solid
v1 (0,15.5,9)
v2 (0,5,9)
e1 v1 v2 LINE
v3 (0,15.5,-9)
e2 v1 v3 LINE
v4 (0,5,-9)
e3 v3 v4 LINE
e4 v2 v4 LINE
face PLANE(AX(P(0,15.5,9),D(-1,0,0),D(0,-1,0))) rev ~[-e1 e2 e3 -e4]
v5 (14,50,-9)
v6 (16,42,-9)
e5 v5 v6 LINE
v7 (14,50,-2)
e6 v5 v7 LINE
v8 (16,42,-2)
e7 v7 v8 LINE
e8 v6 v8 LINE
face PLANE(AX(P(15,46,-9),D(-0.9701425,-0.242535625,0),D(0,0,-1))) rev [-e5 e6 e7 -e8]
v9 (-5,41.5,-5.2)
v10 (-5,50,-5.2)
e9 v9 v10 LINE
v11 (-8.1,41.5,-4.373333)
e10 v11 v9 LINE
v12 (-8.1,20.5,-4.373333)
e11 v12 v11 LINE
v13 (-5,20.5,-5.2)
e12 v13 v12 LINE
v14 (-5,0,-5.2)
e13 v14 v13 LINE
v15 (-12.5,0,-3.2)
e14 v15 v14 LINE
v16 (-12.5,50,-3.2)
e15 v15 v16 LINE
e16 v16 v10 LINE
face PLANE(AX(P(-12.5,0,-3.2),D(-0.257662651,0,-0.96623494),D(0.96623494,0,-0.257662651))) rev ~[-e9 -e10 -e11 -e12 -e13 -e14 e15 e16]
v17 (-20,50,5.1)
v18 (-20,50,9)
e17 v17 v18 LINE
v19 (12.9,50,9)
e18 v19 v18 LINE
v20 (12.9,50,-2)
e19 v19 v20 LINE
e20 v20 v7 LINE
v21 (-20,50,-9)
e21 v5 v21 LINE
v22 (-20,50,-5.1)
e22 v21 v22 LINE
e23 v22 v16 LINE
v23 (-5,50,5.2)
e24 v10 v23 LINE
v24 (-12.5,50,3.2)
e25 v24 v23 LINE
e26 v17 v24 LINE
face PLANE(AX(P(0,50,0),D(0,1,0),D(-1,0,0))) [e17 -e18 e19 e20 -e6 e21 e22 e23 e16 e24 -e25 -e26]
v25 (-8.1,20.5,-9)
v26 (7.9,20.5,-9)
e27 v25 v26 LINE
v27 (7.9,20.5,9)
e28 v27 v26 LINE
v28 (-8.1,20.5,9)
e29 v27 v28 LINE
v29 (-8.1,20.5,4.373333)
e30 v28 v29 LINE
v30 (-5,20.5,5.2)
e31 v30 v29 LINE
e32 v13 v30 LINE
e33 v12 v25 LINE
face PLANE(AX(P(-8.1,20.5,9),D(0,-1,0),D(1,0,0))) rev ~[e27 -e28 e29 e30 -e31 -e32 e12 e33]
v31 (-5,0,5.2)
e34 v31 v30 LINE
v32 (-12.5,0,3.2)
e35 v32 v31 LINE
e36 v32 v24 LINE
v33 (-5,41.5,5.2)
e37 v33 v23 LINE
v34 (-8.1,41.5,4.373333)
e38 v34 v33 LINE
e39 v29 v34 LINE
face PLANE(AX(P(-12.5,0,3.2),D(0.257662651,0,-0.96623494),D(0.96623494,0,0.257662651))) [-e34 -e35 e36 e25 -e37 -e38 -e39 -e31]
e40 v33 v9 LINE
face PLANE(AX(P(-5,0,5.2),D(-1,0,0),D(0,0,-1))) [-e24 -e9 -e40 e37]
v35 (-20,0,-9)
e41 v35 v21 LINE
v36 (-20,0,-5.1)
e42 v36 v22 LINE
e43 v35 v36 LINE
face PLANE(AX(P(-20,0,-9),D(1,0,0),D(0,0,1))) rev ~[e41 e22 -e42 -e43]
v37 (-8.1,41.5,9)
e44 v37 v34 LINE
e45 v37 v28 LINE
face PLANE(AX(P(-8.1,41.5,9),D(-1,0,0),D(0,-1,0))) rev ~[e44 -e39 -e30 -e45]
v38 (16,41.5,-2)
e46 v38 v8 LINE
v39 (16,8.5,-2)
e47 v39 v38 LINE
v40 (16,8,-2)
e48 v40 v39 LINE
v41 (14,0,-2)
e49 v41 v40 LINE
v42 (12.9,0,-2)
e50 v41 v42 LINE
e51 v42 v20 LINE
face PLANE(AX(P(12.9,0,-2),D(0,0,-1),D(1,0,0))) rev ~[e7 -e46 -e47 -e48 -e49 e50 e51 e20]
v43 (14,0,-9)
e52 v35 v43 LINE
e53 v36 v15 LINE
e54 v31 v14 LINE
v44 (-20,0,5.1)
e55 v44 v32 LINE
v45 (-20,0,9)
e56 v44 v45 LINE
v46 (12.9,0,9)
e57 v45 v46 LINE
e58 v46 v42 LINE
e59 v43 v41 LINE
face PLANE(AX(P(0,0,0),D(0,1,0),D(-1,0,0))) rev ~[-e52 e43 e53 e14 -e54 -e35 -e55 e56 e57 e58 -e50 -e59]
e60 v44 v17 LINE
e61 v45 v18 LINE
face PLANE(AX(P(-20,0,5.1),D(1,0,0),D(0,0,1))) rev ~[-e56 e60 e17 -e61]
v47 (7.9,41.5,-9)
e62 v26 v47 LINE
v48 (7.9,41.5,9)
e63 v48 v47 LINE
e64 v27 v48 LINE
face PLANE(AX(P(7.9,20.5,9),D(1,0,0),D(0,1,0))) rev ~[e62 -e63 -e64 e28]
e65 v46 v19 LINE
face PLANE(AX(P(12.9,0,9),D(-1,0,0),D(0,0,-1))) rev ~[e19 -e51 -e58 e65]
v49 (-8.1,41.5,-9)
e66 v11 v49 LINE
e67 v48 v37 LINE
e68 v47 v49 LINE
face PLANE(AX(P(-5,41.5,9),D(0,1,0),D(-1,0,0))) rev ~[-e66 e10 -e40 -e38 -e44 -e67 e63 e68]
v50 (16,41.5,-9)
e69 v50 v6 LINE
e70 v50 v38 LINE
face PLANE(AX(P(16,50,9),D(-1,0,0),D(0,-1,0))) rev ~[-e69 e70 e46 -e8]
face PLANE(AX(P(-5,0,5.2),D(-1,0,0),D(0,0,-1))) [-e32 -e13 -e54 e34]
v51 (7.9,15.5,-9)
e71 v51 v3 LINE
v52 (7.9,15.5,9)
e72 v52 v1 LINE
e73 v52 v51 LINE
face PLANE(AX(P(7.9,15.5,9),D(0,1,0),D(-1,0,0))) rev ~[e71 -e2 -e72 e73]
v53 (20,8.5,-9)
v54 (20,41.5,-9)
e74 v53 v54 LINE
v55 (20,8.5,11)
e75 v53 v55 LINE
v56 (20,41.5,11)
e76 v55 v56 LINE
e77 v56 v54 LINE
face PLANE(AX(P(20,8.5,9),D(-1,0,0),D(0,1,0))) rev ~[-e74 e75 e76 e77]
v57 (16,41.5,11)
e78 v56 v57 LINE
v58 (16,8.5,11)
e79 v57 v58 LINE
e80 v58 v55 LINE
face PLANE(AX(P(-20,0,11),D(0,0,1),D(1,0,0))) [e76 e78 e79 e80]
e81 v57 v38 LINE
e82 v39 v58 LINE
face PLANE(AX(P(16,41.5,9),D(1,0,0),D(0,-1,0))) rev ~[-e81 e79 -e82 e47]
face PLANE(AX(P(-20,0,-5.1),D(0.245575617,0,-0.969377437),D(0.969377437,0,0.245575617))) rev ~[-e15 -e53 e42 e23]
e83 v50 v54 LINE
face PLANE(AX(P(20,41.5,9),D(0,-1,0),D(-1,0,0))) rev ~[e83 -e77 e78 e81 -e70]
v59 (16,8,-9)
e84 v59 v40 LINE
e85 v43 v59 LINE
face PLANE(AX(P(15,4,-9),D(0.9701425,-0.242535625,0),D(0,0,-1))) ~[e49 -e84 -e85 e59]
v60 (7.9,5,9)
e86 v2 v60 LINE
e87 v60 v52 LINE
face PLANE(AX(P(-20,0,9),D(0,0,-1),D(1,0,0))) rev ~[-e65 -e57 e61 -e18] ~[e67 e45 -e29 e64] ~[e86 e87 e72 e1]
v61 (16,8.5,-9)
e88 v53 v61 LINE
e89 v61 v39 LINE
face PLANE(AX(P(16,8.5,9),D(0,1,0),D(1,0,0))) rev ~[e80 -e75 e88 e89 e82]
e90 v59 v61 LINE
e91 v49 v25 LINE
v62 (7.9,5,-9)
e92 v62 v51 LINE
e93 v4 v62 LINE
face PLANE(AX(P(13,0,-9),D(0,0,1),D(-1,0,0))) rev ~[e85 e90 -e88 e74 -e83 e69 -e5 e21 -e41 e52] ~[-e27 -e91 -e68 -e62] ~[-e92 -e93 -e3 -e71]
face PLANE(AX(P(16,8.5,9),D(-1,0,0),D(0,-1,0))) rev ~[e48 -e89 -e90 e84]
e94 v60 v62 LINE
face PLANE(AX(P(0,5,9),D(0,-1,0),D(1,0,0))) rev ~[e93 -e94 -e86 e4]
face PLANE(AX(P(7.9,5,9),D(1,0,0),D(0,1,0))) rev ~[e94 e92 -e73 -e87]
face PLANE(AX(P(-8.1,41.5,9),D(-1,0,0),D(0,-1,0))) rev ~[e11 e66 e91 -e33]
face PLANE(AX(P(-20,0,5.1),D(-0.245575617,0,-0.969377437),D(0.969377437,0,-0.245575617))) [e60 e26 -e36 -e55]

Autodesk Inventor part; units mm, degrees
ref_plane "YZ Plane" through (0, 0, 0) normal (1, 0, 0) x (0, 1, 0)
ref_plane "XZ Plane" through (0, 0, 0) normal (0, 1, 0) x (-1, 0, 0)
ref_plane "XY Plane" through (0, 0, 0) normal (0, 0, 1) x (1, 0, 0)
sketch "草图1" plane through (0, 0, 0) normal (0, 1, 0) x (-1, 0, 0)
  line L0 (20, 9) -> (-20, 9)
  line L1 (-20, 9) -> (-20, -9)
  line L2 (-20, -9) -> (20, -9)
  line L3 (20, 5.1) -> (12.5, 3.2)
  line L4 (12.5, 3.2) -> (5, 5.2)
  line L5 (5, 0) -> (0, 0)
  line L6 (20, -5.1) -> (12.5, -3.2)
  line L7 (12.5, -3.2) -> (5, -5.2)
  line L8 (-13, 9) -> (-13, -9)
  line L9 (20, -9) -> (20, -5.1)
  line L10 (20, 5.1) -> (20, 9)
  line L11 (5, 5.2) -> (5, -5.2)
  line L12 (5, -5.2) -> (-20, -5.2)
  line L13 (-12.9, 9) -> (-12.9, -2)
  line L14 (-12.9, -2) -> (-16, -2)
  line L15 (-16, -2) -> (-16, 9)
  line L16 (-12.9, -2) -> (-16, -2)
  line L17 (-16, -2) -> (-16, 9)
  line L18 (-16, 9) -> (-12.9, 9)
  line L19 (-12.9, 9) -> (-12.9, -2)
  dimension "d0" = 18
  dimension "d1" = 40
  dimension "d4" = 3.9
  dimension "d6" = 5.8
  dimension "d8" = 3.8
  dimension "d13" = 33
  dimension "d14" = 11
  dimension "d15" = 3.1
  dimension "d16" = 4
  dimension "d39" = 9
extrude "拉伸1" add sketch "草图1" along normal blind 50
extrude "拉伸2" cut sketch "草图1" along normal blind 50 contours L13 L14 L8 L0 | L8 L14 L15 L0
sketch "草图2" plane through (20, 0, 9) normal (0, 0, 1) x (1, 0, 0)
  line L0 (-4, 50) -> (-4, 0) projected
  line L1 (-4, 0) -> (0, 0) projected
  line L2 (0, 0) -> (0, 50) projected
  line L3 (-4, 50) -> (0, 50) projected
  line L4 (-4, 50) -> (-4, 0) projected
  line L5 (0, 0) -> (0, 50) projected
  line L6 (-4, 8.5) -> (0, 8.5)
  line L7 (0, 8.5) -> (0, 41.5)
  line L8 (0, 41.5) -> (-4, 41.5)
  line L9 (-4, 41.5) -> (-4, 8.5)
  point P0 (-20, 0)
  point P1 (-4, 25)
  dimension "d19" = 33
extrude "拉伸3" cut sketch "草图2" against normal up to next contours L3 L2 L8 L0 | L6 L2 L1 L0
chamfer "倒角1" distance 2 distance2 8 1 edges at (16, 0, -5.5) measured on face at (6.9333, 0, 4.0667)
chamfer "倒角2" distance 2 distance2 8 1 edges at (16, 50, -5.5) measured on face at (6.9333, 50, 4.0667)
sketch "草图3" plane through (-20, 0, 9) normal (0, 0, 1) x (1, 0, 0)
  line L0 (15, 0) -> (15, 50) projected
  line L1 (15, 0) -> (15, 50) projected
  line L2 (32.9, 0) -> (32.9, 50) projected
  line L3 (11.9, 20.5) -> (27.9, 20.5)
  line L4 (27.9, 20.5) -> (27.9, 41.5)
  line L5 (27.9, 41.5) -> (11.9, 41.5)
  line L6 (11.9, 41.5) -> (11.9, 20.5)
  line L7 (0, 50) -> (32.9, 50) projected
  line L8 (20, 5) -> (27.9, 5)
  line L9 (27.9, 5) -> (27.9, 15.5)
  line L10 (27.9, 15.5) -> (20, 15.5)
  line L11 (20, 15.5) -> (20, 5)
  line L12 (0, 0) -> (32.9, 0) projected
  point P0 (20, 0)
  dimension "d28" = 21
  dimension "d29" = 8.5
  dimension "d30" = 5
  dimension "d32" = 21
  dimension "d35" = 5
  dimension "d36" = 5
  dimension "d37" = 5
  dimension "d38" = 5
extrude "拉伸4" cut sketch "草图3" against normal blind 50 contours L3 L6 L5 L0 | L0 L5 L4 L3 | L11 L10 L9 L8
sketch "草图4" plane through (-20, 0, 9) normal (0, 0, 1) x (1, 0, 0)
  line L0 (27.9, 15.5) -> (27.9, 5) projected
  line L1 (27.9, 5) -> (20, 5) projected
  line L2 (20, 5) -> (20, 15.5) projected
  line L3 (20, 15.5) -> (27.9, 15.5) projected
  line L4 (27.9, 41.5) -> (27.9, 20.5) projected
  line L5 (27.9, 20.5) -> (11.9, 20.5) projected
  line L6 (11.9, 20.5) -> (11.9, 41.5) projected
  line L7 (11.9, 41.5) -> (27.9, 41.5) projected
  line L8 (32.9, 0) -> (32.9, 50) projected
  line L9 (0, 50) -> (32.9, 50) projected
  line L10 (0, 0) -> (0, 50) projected
  line L11 (0, 0) -> (32.9, 0) projected
  line L12 (36, 8.5) -> (40, 8.5) projected
  line L13 (40, 8.5) -> (40, 41.5) projected
  line L14 (40, 41.5) -> (36, 41.5) projected
  line L15 (36, 41.5) -> (36, 8.5) projected
  point P0 (20, 0)
extrude "拉伸6" add sketch "草图4" along normal blind 2 contours L15 L14 L13 L12
properties part number "latte_d435_frame_new_legs"
